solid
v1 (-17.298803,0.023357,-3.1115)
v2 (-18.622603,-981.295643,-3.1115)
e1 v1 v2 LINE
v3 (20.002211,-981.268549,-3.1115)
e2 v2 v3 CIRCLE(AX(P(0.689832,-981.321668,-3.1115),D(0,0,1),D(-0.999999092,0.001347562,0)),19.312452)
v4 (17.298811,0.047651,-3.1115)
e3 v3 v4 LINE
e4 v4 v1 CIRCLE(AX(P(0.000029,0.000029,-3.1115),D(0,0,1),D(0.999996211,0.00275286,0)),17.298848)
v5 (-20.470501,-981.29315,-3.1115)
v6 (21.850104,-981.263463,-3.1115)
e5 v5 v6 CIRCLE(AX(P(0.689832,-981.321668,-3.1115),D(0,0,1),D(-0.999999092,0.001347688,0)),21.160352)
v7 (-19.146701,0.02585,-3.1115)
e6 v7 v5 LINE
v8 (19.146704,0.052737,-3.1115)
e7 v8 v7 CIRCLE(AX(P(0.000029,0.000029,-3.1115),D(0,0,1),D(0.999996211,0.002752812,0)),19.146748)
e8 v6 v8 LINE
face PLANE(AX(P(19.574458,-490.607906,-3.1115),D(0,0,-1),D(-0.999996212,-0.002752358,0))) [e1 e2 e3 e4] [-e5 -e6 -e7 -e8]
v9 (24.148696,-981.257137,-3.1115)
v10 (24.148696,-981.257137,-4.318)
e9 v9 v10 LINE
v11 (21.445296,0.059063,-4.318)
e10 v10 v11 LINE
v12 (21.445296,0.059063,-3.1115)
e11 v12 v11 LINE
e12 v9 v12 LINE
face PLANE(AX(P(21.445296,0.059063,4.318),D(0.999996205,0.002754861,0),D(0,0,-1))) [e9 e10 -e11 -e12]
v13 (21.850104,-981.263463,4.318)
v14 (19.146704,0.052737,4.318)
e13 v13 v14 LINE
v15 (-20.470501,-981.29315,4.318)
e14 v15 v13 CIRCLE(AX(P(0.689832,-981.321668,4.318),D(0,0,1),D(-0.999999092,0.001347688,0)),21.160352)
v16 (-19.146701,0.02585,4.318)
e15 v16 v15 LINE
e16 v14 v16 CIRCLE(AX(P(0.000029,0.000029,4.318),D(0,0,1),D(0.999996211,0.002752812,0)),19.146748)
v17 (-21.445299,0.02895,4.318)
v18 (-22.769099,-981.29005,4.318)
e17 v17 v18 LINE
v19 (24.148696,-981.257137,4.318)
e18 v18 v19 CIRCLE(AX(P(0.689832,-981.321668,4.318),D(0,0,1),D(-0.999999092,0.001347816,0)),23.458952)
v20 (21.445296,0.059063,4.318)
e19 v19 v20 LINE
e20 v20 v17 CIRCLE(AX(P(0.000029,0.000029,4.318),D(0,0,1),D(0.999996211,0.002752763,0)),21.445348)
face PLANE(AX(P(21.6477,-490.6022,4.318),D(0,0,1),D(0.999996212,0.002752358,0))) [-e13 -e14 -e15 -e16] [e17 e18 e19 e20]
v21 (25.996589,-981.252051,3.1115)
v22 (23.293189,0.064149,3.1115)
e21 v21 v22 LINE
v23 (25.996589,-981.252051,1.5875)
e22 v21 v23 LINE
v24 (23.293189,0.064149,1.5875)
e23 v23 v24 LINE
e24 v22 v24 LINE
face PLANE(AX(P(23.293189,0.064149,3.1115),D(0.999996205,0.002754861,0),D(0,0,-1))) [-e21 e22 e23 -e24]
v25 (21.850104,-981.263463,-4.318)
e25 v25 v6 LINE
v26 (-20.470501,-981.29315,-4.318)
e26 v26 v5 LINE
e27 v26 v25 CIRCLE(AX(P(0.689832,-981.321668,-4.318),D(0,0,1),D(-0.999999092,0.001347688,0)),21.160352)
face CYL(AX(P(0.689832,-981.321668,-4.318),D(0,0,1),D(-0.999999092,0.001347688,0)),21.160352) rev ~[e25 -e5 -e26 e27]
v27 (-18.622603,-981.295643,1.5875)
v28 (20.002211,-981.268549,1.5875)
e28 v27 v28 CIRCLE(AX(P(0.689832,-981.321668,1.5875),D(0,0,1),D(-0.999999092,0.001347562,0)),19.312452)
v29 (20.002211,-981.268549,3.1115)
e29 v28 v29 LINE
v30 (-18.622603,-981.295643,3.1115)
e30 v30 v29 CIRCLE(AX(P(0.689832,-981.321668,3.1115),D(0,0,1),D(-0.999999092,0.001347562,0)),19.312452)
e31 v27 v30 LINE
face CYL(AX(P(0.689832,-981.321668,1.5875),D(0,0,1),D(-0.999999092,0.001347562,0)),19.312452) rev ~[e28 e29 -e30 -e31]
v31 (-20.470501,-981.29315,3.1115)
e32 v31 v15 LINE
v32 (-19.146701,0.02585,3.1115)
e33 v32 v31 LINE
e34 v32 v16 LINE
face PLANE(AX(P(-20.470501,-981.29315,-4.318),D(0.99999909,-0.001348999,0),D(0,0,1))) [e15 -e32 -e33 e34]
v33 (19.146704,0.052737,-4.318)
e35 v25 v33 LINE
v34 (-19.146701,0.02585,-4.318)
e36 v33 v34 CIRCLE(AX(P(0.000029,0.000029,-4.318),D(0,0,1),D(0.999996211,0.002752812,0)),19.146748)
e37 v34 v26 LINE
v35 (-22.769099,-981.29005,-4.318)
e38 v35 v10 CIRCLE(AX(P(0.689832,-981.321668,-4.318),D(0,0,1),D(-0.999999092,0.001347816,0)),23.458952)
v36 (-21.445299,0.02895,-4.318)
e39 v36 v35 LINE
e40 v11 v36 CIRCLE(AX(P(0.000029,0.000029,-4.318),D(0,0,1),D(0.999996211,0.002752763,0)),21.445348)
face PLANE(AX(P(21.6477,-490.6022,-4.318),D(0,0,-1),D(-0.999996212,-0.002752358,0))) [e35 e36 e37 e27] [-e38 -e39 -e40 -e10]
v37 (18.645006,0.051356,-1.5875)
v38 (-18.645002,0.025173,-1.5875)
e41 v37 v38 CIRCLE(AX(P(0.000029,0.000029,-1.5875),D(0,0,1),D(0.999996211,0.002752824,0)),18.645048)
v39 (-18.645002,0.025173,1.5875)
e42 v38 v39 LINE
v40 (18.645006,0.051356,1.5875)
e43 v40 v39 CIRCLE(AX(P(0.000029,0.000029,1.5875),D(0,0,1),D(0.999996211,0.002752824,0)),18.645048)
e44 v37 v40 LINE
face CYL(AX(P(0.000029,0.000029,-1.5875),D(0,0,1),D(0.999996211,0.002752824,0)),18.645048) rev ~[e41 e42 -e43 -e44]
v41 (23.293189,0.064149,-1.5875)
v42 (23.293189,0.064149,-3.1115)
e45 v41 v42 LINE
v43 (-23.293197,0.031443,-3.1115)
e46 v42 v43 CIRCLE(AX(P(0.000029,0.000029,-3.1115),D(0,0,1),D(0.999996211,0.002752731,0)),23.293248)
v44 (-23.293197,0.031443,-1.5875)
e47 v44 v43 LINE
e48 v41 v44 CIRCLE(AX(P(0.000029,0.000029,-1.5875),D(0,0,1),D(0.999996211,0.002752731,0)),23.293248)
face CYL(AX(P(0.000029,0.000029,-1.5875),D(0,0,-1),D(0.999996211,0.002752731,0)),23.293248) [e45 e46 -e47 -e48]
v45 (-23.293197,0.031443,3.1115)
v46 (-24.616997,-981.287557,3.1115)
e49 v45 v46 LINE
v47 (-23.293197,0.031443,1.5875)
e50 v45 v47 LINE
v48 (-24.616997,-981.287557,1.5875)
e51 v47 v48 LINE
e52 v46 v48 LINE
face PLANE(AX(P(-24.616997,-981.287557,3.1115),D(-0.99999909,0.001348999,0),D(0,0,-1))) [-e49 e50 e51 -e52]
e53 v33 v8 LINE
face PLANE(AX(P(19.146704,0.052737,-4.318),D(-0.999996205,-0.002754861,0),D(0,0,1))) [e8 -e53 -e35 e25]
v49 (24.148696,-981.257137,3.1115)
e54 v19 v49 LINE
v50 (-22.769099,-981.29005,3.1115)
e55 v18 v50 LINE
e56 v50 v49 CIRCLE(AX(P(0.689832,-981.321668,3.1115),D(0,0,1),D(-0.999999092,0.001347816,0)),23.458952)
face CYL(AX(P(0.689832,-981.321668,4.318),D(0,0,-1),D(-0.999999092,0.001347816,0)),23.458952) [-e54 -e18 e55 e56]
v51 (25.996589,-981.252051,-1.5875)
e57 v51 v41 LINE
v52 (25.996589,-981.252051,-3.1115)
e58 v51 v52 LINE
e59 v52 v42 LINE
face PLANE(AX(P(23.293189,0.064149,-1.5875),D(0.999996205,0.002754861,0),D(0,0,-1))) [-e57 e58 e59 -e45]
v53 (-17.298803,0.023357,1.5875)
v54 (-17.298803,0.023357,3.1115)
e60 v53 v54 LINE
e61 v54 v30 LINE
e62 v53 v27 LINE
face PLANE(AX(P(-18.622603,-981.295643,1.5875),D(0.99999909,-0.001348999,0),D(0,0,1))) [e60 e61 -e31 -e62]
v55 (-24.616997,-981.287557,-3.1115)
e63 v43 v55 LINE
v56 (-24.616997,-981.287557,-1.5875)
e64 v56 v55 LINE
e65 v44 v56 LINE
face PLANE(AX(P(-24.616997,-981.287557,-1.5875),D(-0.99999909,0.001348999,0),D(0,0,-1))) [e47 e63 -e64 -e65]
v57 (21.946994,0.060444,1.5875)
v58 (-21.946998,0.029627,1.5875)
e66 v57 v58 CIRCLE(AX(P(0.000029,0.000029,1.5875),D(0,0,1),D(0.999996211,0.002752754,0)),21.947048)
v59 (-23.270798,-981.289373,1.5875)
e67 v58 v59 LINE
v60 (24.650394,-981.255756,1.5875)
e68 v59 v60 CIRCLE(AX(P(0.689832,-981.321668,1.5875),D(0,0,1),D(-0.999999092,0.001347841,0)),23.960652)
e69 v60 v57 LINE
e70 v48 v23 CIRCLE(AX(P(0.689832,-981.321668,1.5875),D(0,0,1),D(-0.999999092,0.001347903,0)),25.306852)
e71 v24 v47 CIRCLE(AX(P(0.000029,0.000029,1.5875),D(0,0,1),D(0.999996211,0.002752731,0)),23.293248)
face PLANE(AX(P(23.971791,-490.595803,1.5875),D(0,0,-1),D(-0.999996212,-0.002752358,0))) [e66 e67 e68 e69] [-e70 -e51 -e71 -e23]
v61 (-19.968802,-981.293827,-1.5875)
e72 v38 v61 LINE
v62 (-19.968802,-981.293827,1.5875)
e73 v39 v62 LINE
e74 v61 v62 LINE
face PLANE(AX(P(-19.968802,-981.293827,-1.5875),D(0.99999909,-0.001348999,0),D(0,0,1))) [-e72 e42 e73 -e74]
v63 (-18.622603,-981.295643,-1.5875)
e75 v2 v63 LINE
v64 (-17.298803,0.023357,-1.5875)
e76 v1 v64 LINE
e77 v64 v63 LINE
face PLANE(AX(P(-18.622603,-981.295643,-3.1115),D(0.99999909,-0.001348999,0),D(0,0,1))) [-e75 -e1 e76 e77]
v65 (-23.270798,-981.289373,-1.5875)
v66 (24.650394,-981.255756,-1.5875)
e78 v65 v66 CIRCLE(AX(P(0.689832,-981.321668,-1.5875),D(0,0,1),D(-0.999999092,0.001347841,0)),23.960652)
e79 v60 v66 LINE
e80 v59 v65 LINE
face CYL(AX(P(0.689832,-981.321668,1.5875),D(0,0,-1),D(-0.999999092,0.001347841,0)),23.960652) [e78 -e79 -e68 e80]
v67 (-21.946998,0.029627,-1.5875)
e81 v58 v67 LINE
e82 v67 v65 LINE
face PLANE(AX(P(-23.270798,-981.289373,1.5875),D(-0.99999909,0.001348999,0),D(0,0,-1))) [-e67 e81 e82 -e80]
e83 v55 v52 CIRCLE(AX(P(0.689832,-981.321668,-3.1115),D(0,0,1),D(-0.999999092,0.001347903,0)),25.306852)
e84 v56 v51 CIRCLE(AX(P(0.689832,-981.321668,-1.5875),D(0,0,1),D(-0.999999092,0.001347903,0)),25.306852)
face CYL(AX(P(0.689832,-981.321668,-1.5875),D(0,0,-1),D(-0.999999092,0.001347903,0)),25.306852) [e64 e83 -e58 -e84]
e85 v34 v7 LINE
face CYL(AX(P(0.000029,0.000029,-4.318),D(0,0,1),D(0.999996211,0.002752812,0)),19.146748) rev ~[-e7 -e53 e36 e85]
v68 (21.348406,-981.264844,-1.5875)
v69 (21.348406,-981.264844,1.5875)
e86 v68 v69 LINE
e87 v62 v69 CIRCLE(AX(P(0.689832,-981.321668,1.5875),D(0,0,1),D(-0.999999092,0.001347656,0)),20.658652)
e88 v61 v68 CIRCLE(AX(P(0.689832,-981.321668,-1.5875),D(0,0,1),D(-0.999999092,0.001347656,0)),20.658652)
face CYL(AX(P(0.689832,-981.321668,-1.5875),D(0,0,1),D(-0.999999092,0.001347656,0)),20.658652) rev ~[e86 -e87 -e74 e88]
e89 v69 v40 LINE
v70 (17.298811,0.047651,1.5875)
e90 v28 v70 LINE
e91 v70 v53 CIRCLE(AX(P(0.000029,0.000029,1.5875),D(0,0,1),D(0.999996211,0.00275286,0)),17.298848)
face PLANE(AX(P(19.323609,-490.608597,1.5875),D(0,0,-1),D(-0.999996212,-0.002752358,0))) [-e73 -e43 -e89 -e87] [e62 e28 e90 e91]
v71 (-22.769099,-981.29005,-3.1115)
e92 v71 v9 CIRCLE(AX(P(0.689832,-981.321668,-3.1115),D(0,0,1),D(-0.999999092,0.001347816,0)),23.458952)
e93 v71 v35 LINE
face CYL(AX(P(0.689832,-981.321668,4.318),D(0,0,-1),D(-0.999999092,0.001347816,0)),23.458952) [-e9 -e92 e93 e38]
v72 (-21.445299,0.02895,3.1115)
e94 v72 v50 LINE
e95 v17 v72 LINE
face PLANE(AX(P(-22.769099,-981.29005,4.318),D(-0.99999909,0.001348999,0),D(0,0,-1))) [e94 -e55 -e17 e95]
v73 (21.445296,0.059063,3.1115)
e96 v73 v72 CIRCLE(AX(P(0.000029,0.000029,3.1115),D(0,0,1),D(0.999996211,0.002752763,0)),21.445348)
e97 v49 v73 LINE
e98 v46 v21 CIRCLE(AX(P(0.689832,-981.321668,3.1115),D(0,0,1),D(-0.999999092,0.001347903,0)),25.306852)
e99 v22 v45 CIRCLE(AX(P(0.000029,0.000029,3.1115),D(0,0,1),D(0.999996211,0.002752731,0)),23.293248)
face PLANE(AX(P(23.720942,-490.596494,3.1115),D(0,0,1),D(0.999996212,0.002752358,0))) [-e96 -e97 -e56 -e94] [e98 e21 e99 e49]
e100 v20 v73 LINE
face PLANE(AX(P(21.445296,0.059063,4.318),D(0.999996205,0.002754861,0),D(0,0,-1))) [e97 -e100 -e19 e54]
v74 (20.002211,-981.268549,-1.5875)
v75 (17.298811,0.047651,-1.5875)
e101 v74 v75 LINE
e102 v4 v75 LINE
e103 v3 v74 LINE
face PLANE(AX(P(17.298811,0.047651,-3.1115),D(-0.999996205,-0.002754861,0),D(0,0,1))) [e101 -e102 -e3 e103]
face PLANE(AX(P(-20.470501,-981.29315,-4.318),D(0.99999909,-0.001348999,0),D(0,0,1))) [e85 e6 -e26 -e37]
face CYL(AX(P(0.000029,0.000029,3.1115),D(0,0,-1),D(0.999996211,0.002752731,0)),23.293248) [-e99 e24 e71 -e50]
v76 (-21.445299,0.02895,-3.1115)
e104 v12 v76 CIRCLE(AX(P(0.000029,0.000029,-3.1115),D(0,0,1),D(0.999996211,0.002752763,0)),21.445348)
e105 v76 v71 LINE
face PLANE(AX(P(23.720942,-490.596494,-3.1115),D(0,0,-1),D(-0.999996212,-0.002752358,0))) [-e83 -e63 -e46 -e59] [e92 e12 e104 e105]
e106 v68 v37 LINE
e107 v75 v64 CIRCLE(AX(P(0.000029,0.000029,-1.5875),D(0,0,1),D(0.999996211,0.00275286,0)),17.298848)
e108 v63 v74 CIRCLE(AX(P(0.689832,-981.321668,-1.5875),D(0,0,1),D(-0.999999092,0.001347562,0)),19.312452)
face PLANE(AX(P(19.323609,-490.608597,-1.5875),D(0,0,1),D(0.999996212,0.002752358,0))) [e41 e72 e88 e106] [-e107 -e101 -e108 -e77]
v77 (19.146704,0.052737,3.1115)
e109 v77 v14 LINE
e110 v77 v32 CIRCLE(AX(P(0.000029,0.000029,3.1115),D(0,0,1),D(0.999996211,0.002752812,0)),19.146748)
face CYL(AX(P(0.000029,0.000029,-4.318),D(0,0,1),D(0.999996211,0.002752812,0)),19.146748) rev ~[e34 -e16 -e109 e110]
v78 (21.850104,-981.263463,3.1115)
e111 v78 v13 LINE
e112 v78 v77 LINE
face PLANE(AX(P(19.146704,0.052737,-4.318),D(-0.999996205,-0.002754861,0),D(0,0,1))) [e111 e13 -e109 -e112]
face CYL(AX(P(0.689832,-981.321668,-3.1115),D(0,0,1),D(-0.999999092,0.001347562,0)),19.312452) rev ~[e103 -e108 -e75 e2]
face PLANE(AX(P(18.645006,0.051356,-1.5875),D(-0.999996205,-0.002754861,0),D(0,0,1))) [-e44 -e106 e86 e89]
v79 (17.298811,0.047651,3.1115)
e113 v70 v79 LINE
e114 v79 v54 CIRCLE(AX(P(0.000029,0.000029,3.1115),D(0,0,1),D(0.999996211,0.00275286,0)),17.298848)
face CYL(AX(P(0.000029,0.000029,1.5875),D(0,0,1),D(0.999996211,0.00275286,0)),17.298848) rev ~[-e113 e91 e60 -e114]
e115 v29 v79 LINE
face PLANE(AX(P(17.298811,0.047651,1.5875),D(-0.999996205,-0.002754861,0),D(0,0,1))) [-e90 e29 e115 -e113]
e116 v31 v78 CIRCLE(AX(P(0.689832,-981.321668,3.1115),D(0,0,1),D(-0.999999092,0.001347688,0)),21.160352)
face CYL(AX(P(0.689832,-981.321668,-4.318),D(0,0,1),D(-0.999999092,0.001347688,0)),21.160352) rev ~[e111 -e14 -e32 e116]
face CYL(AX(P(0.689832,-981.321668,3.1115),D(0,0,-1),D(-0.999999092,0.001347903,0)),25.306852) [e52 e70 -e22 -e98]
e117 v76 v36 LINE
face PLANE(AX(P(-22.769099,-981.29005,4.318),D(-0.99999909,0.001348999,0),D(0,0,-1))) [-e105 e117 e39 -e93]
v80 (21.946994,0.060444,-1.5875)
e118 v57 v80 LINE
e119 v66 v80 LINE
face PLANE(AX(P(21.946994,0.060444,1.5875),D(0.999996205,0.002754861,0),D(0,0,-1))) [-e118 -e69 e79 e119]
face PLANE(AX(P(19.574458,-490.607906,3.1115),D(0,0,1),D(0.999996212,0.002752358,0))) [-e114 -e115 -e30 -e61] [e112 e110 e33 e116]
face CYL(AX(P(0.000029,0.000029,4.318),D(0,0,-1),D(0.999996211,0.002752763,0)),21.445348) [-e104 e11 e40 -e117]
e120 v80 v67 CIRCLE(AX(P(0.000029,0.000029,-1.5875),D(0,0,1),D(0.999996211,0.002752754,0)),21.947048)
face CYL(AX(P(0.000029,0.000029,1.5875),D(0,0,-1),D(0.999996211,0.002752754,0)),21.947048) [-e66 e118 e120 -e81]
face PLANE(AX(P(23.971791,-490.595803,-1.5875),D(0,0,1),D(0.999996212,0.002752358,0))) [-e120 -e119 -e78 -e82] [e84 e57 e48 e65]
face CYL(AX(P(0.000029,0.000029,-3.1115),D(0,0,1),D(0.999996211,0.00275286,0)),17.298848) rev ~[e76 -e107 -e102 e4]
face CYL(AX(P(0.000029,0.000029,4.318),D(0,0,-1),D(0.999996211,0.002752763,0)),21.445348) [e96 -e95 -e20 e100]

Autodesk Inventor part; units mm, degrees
ref_plane "Work Plane2" through (0, 0, 0) normal (-1, 0, 0) x (0, 0, 1)
ref_plane "Work Plane3" through (0.6898, -981.3217, 0) normal (0.1309701, 0.9913863, 0) x (0, 0, 1)
sketch "Path" plane through (0, 0, 0) normal (0, 0, 1) x (1, 0, 0)
  arc A0 (20.296, 0.0559) -> (-20.296, 0.0274) centre (0, 0) ccw
  arc A1 (-21.6198, -981.2916) -> (22.9994, -981.2603) centre (0.6898, -981.3217) ccw
  line L0 (-21.6198, -981.2916) -> (-20.296, 0.0274)
  line L1 (20.296, 0.0559) -> (22.9994, -981.2603)
  dimension "d31" = 5.9944
ref_plane "Section Plane" through (-20.296, 0.0274, 0) normal (-0.001349, -0.9999991, 0) x (0, 0, 1)
sketch "Section Sketch" plane through (-20.296, 0.0274, 0) normal (-0.001349, -0.9999991, 0) x (0, 0, 1)
  line L0 (-4.318, -1.1493) -> (4.318, -1.1493)
  line L1 (4.318, -1.1493) -> (4.318, 1.1493)
  line L2 (4.318, 1.1493) -> (-4.318, 1.1493)
  line L3 (-4.318, 1.1493) -> (-4.318, -1.1493)
  line L4 (-1.5875, -1.651) -> (1.5875, -1.651)
  line L5 (1.5875, -1.651) -> (1.5875, 1.651)
  line L6 (1.5875, 1.651) -> (-1.5875, 1.651)
  line L7 (-1.5875, 1.651) -> (-1.5875, -1.651)
  line L8 (-1.5875, 0) -> (1.5875, 0) construction
  line L9 (-3.1115, -2.9972) -> (-1.5875, -2.9972)
  line L10 (-1.5875, -2.9972) -> (-1.5875, 2.9972)
  line L11 (-1.5875, 2.9972) -> (-3.1115, 2.9972)
  line L12 (-3.1115, 2.9972) -> (-3.1115, -2.9972)
  line L13 (1.5875, -2.9972) -> (3.1115, -2.9972)
  line L14 (3.1115, -2.9972) -> (3.1115, 2.9972)
  line L15 (3.1115, 2.9972) -> (1.5875, 2.9972)
  line L16 (1.5875, 2.9972) -> (1.5875, -2.9972)
  line L17 (-4.318, 0) -> (4.318, 0) construction
  point P0 (0, 0)
  point P1 (0, 0)
  dimension "d21" = 2.2987
  dimension "d22" = 3.302
  dimension "d23" = 3.175
  dimension "d24" = 1.524
  dimension "d31" = 5.9944
  dimension "d32" = 8.636
sweep "Solid" add profiles "Section Sketch" path "Path"
pattern_of_one "Strand Pattern"
equation "\"d21\" = da_d2"
equation "\"d22\" = da_d1"
equation "\"d23\" = da_b1"
equation "\"d24\" = da_t1 + da_t2"
equation "\"d30\" = da_pt"
equation "\"da_p\" = 6.35"
equation "\"da_b1\" = 3.175"
equation "\"da_h2\" = 5.9944"
equation "\"da_h3\" = 5.207"
equation "\"da_d1\" = 3.302"
equation "\"da_d2\" = 2.2987"
equation "\"da_pt\" = 6.4008"
equation "\"da_b\" = 8.636"
equation "\"da_t1\" = 0.762"
equation "\"da_t2\" = 0.762"
properties part number "Roller Chain"
